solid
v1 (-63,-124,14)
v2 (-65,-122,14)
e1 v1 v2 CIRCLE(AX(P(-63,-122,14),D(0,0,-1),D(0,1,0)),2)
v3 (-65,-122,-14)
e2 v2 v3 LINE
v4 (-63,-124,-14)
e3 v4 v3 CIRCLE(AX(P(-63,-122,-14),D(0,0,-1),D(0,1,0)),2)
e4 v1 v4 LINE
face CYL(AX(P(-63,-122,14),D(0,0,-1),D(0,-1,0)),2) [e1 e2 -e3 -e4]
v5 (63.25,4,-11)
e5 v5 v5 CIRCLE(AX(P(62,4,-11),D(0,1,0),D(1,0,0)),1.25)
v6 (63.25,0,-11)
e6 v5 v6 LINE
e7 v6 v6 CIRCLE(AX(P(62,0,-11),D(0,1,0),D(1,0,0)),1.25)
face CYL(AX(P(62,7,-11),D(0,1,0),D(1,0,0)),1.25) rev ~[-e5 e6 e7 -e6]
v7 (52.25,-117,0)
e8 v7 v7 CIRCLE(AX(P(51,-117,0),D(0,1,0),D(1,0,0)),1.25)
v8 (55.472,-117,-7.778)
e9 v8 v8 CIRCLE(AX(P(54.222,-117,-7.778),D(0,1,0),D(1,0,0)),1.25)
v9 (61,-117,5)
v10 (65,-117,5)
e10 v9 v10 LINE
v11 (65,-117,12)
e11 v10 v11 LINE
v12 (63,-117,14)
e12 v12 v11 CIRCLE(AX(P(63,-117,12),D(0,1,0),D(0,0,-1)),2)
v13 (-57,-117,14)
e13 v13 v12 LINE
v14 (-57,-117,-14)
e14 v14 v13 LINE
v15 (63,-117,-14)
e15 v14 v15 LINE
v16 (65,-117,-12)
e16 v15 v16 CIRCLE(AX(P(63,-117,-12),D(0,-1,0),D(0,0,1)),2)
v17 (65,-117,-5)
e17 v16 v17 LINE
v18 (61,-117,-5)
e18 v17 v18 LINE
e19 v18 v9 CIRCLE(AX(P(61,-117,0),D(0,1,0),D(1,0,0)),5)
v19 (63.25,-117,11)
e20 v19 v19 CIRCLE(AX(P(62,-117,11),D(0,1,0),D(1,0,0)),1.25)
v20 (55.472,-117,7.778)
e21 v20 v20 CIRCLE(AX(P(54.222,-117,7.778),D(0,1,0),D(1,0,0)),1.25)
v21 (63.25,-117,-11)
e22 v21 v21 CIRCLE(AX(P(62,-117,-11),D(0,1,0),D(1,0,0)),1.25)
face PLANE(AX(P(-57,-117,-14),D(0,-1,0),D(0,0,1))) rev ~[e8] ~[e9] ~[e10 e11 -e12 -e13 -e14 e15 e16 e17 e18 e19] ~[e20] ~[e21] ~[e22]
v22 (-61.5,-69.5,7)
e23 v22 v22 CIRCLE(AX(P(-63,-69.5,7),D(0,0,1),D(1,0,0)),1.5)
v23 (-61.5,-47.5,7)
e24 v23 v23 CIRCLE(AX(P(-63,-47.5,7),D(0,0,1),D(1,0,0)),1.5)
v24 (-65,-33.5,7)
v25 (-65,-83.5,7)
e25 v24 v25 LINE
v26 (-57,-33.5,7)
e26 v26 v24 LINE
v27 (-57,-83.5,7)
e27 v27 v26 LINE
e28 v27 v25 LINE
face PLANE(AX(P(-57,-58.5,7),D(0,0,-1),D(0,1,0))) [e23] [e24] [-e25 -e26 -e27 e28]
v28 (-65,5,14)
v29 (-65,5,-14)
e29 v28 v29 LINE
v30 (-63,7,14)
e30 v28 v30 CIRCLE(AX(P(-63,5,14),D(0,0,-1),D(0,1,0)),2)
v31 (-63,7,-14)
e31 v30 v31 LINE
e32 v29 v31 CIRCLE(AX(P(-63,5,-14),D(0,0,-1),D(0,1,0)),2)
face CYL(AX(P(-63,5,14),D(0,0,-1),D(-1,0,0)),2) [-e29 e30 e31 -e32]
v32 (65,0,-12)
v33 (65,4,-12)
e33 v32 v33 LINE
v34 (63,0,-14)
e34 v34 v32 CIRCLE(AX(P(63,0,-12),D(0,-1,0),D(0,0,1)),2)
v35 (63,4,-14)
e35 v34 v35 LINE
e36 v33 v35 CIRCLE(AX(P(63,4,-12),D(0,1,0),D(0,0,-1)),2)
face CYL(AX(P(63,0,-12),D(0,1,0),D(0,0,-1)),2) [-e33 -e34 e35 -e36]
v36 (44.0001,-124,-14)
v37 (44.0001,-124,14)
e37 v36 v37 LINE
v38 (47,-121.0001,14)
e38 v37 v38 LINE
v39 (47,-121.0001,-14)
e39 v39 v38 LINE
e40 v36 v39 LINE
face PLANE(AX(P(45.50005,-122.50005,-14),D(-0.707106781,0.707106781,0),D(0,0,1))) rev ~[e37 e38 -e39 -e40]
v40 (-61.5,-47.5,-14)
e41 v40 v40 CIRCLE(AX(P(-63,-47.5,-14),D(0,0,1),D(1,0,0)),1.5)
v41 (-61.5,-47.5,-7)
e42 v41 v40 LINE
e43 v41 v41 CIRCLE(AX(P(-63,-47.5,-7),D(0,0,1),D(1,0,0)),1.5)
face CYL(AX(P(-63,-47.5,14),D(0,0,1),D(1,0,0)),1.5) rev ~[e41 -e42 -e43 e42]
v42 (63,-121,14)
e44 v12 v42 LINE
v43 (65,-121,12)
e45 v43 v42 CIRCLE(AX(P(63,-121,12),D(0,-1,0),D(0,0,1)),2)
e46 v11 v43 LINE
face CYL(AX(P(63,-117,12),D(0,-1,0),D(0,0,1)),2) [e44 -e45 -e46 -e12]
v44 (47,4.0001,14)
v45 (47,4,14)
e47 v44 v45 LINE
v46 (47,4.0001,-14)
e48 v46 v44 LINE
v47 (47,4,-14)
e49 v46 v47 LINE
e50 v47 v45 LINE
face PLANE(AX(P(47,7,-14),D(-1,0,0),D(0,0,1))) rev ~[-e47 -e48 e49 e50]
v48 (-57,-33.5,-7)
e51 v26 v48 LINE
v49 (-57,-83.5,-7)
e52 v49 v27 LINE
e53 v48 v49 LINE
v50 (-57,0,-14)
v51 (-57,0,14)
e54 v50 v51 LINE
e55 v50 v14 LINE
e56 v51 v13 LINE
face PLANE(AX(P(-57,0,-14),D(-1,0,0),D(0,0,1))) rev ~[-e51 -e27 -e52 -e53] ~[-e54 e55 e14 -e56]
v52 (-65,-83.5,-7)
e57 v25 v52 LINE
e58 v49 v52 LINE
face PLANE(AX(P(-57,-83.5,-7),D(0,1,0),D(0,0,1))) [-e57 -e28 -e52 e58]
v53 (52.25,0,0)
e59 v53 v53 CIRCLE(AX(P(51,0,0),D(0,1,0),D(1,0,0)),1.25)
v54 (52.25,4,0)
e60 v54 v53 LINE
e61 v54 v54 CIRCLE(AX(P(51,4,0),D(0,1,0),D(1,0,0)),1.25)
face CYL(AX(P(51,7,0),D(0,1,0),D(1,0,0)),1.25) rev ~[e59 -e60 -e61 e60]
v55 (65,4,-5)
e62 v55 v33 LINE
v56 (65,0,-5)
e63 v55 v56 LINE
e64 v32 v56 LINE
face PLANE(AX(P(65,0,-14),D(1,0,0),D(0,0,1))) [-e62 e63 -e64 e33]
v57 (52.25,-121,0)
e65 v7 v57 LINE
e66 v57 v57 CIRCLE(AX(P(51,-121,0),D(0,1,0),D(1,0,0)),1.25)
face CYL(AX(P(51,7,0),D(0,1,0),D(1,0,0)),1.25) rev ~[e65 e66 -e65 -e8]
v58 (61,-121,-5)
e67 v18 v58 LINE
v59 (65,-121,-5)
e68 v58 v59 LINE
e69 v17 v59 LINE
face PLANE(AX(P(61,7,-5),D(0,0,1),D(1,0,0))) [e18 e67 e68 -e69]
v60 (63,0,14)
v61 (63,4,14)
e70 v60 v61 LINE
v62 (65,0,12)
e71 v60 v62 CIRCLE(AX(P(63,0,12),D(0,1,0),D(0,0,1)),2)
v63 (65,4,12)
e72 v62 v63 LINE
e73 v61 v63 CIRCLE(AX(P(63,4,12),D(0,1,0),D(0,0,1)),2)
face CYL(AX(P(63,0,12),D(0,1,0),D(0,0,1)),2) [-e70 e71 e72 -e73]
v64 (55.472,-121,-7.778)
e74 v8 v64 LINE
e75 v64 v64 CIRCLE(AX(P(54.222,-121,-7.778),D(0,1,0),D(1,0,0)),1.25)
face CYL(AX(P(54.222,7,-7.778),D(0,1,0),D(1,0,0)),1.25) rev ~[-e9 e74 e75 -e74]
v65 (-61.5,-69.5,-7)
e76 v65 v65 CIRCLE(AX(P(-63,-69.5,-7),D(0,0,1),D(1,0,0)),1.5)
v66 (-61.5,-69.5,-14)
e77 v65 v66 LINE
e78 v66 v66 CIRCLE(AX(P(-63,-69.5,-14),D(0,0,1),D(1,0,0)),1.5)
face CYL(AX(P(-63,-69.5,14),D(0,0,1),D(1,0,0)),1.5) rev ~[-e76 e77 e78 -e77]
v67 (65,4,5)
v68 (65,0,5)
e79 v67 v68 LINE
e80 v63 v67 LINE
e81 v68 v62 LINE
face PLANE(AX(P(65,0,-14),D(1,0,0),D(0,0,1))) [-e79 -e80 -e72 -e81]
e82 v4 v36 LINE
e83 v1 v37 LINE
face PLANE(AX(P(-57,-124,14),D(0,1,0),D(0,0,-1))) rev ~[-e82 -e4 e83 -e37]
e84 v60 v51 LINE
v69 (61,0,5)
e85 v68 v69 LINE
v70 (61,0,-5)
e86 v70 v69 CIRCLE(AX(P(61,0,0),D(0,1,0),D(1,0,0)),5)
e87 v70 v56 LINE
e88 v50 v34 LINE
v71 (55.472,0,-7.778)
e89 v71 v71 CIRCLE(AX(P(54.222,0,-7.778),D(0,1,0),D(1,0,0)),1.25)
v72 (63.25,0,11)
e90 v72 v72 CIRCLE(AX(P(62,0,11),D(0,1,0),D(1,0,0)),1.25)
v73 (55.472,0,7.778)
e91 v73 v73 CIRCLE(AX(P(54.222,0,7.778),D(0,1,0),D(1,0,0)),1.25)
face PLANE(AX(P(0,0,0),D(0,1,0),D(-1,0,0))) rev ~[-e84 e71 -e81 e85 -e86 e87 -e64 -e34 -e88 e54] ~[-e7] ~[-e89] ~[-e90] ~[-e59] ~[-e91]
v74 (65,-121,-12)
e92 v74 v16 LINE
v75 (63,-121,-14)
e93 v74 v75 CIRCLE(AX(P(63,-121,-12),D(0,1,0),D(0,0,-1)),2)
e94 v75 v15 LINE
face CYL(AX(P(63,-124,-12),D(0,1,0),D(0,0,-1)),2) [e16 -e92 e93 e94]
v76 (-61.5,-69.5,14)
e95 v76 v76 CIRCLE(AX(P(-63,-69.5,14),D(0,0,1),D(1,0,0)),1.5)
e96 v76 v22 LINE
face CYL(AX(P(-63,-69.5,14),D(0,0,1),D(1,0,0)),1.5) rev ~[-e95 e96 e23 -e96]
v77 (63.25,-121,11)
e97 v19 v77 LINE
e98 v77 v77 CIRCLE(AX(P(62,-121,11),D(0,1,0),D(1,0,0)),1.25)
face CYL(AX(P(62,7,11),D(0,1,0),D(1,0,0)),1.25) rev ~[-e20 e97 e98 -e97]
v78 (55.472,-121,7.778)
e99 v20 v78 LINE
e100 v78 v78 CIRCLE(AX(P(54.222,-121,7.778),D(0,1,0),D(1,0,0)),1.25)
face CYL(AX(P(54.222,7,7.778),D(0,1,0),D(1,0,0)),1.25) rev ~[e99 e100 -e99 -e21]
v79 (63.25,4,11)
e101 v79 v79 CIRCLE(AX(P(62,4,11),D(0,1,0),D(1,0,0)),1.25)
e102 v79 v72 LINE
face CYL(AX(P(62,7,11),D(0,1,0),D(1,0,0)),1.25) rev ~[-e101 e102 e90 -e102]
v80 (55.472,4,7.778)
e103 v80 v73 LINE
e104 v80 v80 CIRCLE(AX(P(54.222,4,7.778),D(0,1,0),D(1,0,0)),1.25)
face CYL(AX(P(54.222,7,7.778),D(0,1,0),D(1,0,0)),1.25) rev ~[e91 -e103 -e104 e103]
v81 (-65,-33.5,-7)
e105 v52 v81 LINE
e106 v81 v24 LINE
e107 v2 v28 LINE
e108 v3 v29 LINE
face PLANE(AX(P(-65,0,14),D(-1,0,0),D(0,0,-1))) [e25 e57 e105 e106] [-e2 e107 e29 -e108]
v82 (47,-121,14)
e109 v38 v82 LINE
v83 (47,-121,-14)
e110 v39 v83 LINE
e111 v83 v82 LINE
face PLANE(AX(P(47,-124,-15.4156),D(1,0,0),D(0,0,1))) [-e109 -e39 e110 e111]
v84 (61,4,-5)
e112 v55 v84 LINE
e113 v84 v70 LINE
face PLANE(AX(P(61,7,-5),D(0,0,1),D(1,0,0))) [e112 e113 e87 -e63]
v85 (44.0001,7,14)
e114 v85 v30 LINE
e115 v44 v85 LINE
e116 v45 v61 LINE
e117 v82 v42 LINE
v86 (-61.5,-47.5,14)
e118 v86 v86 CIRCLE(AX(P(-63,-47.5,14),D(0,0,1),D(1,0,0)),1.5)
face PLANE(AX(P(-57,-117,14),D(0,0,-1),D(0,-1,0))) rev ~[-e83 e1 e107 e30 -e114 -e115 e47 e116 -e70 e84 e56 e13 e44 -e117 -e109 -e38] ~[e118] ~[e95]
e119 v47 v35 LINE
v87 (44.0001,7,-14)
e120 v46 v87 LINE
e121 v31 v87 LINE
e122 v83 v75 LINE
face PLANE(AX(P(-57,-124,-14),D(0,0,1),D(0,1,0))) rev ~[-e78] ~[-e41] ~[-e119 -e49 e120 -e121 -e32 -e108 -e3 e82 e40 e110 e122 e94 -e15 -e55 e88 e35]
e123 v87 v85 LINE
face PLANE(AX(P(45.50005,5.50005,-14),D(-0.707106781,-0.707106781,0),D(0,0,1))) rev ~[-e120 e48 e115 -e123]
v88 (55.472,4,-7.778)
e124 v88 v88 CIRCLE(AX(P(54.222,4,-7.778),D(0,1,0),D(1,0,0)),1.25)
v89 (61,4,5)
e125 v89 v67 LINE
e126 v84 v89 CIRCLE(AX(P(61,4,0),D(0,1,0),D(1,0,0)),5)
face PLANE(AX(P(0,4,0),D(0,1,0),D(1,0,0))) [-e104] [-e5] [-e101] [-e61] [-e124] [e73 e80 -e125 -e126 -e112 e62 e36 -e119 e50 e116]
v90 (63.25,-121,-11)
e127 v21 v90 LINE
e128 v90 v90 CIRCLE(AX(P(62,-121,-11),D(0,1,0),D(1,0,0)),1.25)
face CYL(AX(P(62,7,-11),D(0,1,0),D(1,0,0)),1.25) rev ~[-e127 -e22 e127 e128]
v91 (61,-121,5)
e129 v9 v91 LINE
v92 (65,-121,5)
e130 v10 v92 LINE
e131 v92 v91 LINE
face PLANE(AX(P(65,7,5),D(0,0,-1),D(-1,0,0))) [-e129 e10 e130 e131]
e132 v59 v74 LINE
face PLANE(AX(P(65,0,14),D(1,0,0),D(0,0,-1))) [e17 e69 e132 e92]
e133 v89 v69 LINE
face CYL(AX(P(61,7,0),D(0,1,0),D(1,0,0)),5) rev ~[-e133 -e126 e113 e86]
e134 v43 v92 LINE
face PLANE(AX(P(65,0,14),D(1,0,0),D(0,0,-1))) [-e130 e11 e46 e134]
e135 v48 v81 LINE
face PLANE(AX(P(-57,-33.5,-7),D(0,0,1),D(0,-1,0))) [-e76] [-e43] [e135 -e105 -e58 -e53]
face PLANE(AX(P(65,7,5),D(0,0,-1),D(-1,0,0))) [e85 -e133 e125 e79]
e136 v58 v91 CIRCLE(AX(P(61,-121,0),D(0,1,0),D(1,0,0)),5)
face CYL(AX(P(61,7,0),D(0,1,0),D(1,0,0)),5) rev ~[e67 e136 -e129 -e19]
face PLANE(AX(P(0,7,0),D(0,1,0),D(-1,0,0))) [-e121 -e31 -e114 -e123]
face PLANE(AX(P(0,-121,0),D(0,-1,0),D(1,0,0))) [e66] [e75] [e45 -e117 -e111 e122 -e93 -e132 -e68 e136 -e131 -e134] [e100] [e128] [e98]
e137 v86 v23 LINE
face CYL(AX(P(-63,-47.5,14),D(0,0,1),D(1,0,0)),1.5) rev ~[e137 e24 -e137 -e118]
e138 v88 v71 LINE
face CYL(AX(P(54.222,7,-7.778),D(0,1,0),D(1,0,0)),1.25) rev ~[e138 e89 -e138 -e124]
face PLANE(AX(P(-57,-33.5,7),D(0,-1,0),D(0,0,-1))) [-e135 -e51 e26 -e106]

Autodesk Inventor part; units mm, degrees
ref_plane "YZ Plane" through (0, 0, 0) normal (1, 0, 0) x (0, 1, 0)
ref_plane "XZ Plane" through (0, 0, 0) normal (0, 1, 0) x (-1, 0, 0)
ref_plane "XY Plane" through (0, 0, 0) normal (0, 0, 1) x (1, 0, 0)
sketch "스케치1" plane through (0, 0, 0) normal (0, 1, 0) x (-1, 0, 0)
  line L0 (65, -14) -> (-65, -14)
  line L1 (-65, -14) -> (-65, 14)
  line L2 (-65, 14) -> (65, 14)
  line L3 (65, 14) -> (65, -14)
  point P0 (0, 0)
  dimension "d0" = 28
  dimension "d1" = 130
  dimension "d2" = 14
  dimension "d3" = 65
extrude "돌출1" add sketch "스케치1" along normal blind 7
sketch "스케치4" plane through (0, 0, 0) normal (0, -1, 0) x (1, 0, 0)
  line L0 (-65, -14) -> (65, -14) projected
  line L1 (65, 14) -> (-65, 14) projected
  line L2 (-65, -14) -> (-57, -14)
  line L3 (-57, -14) -> (-57, 14)
  line L4 (-57, 14) -> (-65, 14)
  line L5 (-65, 14) -> (-65, -14)
  point P0 (0, 0)
  point P1 (63, -14)
  point P2 (63, 14)
  dimension "d26" = 8
extrude "돌출4" add sketch "스케치4" along normal blind 124
fillet "모깎기2" radius 2 1 edges at (-65, 7, 0)
sketch "스케치5" plane through (-57, 0, 14) normal (1, 0, 0) x (0, 0, -1)
  point P0 (14, 0)
sketch "스케치10" plane through (-57, 0, 14) normal (1, 0, 0) x (0, 0, -1)
  line L0 (0, -124) -> (28, -124) projected
  line L1 (28, -124) -> (28, 5) projected
  line L2 (0, -124) -> (28, -124)
  line L3 (28, -124) -> (28, -117)
  line L4 (28, -117) -> (0, -117)
  line L5 (0, -117) -> (0, -124)
  point P0 (14, 0)
  dimension "d52" = 7
extrude "돌출9" add sketch "스케치10" along normal blind 122
sketch "스케치2" plane through (0, 7, 0) normal (0, 1, 0) x (1, 0, 0)
  circle A0 centre (61, 0) radius 5
  line L0 (61, 5) -> (65, 5)
  line L1 (65, 5) -> (65, -5)
  line L2 (65, -5) -> (61, -5)
  line L3 (61, -5) -> (61, 5)
  line L4 (65, -14) -> (65, 14) projected
  point P0 (0, 0)
  dimension "d6" = 10
  dimension "d7" = 0
  dimension "d8" = 10
  dimension "d9" = 5
  dimension "d10" = 4
  dimension "d11" = 0
extrude "돌출2" cut sketch "스케치2" against normal blind 180
sketch "스케치3" plane through (0, 7, 0) normal (0, 1, 0) x (1, 0, 0)
  circle A0 centre (62, 11) radius 1.25
  line L0 (65, 5) -> (65, 14) projected
  line L1 (65, 14) -> (-65, 14) projected
  line L2 (0, 0) -> (4.9885, 0)
  circle A1 centre (62, -11) radius 1.25
  circle A2 centre (51, 0) radius 1.25
  line L3 (-65, -14) -> (65, -14) projected
  circle A3 centre (54.222, -7.778) radius 1.25
  line L4 (65, -14) -> (65, -5) projected
  circle A4 centre (54.222, 7.778) radius 1.25
  dimension "d14" = 2.5
  dimension "d15" = 3
  dimension "d16" = 3
  dimension "d17" = 14
  dimension "d18" = 2.5
  dimension "d19" = 14
  dimension "d20" = 10.778
  dimension "d21" = 6.222
  dimension "d22" = 2.5
extrude "돌출3" cut sketch "스케치3" against normal blind 100000
fillet "모깎기4" radius 2 5 edges at (65, -120.5, 14) (65, -120.5, -14) (65, 3.5, -14) (65, 3.5, 14) (-65, -124, 0)
sketch "스케치11" plane through (-57, -117, 14) normal (0, 0, 1) x (1, 0, 0)
  circle A0 centre (-6, 47.5) radius 1.5
  circle A1 centre (-6, 69.5) radius 1.5
  line L0 (-8, 122) -> (-8, -5) projected
  line L1 (181.1056, 58.5) -> (-67.096, 58.5)
  point P0 (57, 117)
  dimension "d56" = 3
  dimension "d57" = 3
  dimension "d58" = 2
  dimension "d59" = 2
  dimension "d60" = 22
  dimension "d61" = 58.5
  dimension "d62" = 11
extrude "돌출10" cut sketch "스케치11" against normal blind 122
sketch "스케치12" plane through (-57, 0, 14) normal (1, 0, 0) x (0, 0, -1)
  line L0 (7, -33.5) -> (21, -33.5)
  line L1 (21, -33.5) -> (21, -83.5)
  line L2 (21, -83.5) -> (7, -83.5)
  line L3 (7, -83.5) -> (7, -33.5)
  line L4 (0, 0) -> (0, -117) projected
  line L5 (28, 0) -> (28, -117) projected
  line L6 (-36.3144, -58.5) -> (56.0369, -58.5)
  line L7 (9, -117) -> (19, -117) projected
  point P0 (14, 0)
  dimension "d65" = 7
  dimension "d66" = 7
  dimension "d67" = 50
  dimension "d68" = 58.5
  dimension "d69" = 25
extrude "돌출11" cut sketch "스케치12" against normal blind 122
sketch "스케치13" plane through (0, -124, 0) normal (0, -1, 0) x (1, 0, 0)
  line L0 (-63, 14) -> (63, 14) projected
  line L1 (47, 14) -> (65, 14)
  line L2 (65, 14) -> (65, -15.4156)
  line L3 (65, -15.4156) -> (47, -15.4156)
  line L4 (47, -15.4156) -> (47, 14)
  line L5 (65, 12) -> (65, 5) projected
  point P0 (0, 0)
  dimension "d72" = 18
  dimension "d73" = 0
extrude "돌출12" cut sketch "스케치13" against normal blind 3
sketch "스케치14" plane through (0, 7, 0) normal (0, 1, 0) x (1, 0, 0)
  line L0 (-57, -14) -> (63, -14) projected
  line L1 (-57, 14) -> (63, 14) projected
  line L2 (47, -14) -> (65, -14)
  line L3 (65, -14) -> (65, 14)
  line L4 (65, 14) -> (47, 14)
  line L5 (47, 14) -> (47, -14)
  line L6 (65, -12) -> (65, -5) projected
  point P0 (0, 0)
  dimension "d76" = 18
  dimension "d77" = 0
extrude "돌출13" cut sketch "스케치14" against normal blind 3
chamfer "모따기1" distance 3 angle 45 2 edges at (47, 7, 0) (47, -124, 0)
properties part number "shoulder_gear_3"
